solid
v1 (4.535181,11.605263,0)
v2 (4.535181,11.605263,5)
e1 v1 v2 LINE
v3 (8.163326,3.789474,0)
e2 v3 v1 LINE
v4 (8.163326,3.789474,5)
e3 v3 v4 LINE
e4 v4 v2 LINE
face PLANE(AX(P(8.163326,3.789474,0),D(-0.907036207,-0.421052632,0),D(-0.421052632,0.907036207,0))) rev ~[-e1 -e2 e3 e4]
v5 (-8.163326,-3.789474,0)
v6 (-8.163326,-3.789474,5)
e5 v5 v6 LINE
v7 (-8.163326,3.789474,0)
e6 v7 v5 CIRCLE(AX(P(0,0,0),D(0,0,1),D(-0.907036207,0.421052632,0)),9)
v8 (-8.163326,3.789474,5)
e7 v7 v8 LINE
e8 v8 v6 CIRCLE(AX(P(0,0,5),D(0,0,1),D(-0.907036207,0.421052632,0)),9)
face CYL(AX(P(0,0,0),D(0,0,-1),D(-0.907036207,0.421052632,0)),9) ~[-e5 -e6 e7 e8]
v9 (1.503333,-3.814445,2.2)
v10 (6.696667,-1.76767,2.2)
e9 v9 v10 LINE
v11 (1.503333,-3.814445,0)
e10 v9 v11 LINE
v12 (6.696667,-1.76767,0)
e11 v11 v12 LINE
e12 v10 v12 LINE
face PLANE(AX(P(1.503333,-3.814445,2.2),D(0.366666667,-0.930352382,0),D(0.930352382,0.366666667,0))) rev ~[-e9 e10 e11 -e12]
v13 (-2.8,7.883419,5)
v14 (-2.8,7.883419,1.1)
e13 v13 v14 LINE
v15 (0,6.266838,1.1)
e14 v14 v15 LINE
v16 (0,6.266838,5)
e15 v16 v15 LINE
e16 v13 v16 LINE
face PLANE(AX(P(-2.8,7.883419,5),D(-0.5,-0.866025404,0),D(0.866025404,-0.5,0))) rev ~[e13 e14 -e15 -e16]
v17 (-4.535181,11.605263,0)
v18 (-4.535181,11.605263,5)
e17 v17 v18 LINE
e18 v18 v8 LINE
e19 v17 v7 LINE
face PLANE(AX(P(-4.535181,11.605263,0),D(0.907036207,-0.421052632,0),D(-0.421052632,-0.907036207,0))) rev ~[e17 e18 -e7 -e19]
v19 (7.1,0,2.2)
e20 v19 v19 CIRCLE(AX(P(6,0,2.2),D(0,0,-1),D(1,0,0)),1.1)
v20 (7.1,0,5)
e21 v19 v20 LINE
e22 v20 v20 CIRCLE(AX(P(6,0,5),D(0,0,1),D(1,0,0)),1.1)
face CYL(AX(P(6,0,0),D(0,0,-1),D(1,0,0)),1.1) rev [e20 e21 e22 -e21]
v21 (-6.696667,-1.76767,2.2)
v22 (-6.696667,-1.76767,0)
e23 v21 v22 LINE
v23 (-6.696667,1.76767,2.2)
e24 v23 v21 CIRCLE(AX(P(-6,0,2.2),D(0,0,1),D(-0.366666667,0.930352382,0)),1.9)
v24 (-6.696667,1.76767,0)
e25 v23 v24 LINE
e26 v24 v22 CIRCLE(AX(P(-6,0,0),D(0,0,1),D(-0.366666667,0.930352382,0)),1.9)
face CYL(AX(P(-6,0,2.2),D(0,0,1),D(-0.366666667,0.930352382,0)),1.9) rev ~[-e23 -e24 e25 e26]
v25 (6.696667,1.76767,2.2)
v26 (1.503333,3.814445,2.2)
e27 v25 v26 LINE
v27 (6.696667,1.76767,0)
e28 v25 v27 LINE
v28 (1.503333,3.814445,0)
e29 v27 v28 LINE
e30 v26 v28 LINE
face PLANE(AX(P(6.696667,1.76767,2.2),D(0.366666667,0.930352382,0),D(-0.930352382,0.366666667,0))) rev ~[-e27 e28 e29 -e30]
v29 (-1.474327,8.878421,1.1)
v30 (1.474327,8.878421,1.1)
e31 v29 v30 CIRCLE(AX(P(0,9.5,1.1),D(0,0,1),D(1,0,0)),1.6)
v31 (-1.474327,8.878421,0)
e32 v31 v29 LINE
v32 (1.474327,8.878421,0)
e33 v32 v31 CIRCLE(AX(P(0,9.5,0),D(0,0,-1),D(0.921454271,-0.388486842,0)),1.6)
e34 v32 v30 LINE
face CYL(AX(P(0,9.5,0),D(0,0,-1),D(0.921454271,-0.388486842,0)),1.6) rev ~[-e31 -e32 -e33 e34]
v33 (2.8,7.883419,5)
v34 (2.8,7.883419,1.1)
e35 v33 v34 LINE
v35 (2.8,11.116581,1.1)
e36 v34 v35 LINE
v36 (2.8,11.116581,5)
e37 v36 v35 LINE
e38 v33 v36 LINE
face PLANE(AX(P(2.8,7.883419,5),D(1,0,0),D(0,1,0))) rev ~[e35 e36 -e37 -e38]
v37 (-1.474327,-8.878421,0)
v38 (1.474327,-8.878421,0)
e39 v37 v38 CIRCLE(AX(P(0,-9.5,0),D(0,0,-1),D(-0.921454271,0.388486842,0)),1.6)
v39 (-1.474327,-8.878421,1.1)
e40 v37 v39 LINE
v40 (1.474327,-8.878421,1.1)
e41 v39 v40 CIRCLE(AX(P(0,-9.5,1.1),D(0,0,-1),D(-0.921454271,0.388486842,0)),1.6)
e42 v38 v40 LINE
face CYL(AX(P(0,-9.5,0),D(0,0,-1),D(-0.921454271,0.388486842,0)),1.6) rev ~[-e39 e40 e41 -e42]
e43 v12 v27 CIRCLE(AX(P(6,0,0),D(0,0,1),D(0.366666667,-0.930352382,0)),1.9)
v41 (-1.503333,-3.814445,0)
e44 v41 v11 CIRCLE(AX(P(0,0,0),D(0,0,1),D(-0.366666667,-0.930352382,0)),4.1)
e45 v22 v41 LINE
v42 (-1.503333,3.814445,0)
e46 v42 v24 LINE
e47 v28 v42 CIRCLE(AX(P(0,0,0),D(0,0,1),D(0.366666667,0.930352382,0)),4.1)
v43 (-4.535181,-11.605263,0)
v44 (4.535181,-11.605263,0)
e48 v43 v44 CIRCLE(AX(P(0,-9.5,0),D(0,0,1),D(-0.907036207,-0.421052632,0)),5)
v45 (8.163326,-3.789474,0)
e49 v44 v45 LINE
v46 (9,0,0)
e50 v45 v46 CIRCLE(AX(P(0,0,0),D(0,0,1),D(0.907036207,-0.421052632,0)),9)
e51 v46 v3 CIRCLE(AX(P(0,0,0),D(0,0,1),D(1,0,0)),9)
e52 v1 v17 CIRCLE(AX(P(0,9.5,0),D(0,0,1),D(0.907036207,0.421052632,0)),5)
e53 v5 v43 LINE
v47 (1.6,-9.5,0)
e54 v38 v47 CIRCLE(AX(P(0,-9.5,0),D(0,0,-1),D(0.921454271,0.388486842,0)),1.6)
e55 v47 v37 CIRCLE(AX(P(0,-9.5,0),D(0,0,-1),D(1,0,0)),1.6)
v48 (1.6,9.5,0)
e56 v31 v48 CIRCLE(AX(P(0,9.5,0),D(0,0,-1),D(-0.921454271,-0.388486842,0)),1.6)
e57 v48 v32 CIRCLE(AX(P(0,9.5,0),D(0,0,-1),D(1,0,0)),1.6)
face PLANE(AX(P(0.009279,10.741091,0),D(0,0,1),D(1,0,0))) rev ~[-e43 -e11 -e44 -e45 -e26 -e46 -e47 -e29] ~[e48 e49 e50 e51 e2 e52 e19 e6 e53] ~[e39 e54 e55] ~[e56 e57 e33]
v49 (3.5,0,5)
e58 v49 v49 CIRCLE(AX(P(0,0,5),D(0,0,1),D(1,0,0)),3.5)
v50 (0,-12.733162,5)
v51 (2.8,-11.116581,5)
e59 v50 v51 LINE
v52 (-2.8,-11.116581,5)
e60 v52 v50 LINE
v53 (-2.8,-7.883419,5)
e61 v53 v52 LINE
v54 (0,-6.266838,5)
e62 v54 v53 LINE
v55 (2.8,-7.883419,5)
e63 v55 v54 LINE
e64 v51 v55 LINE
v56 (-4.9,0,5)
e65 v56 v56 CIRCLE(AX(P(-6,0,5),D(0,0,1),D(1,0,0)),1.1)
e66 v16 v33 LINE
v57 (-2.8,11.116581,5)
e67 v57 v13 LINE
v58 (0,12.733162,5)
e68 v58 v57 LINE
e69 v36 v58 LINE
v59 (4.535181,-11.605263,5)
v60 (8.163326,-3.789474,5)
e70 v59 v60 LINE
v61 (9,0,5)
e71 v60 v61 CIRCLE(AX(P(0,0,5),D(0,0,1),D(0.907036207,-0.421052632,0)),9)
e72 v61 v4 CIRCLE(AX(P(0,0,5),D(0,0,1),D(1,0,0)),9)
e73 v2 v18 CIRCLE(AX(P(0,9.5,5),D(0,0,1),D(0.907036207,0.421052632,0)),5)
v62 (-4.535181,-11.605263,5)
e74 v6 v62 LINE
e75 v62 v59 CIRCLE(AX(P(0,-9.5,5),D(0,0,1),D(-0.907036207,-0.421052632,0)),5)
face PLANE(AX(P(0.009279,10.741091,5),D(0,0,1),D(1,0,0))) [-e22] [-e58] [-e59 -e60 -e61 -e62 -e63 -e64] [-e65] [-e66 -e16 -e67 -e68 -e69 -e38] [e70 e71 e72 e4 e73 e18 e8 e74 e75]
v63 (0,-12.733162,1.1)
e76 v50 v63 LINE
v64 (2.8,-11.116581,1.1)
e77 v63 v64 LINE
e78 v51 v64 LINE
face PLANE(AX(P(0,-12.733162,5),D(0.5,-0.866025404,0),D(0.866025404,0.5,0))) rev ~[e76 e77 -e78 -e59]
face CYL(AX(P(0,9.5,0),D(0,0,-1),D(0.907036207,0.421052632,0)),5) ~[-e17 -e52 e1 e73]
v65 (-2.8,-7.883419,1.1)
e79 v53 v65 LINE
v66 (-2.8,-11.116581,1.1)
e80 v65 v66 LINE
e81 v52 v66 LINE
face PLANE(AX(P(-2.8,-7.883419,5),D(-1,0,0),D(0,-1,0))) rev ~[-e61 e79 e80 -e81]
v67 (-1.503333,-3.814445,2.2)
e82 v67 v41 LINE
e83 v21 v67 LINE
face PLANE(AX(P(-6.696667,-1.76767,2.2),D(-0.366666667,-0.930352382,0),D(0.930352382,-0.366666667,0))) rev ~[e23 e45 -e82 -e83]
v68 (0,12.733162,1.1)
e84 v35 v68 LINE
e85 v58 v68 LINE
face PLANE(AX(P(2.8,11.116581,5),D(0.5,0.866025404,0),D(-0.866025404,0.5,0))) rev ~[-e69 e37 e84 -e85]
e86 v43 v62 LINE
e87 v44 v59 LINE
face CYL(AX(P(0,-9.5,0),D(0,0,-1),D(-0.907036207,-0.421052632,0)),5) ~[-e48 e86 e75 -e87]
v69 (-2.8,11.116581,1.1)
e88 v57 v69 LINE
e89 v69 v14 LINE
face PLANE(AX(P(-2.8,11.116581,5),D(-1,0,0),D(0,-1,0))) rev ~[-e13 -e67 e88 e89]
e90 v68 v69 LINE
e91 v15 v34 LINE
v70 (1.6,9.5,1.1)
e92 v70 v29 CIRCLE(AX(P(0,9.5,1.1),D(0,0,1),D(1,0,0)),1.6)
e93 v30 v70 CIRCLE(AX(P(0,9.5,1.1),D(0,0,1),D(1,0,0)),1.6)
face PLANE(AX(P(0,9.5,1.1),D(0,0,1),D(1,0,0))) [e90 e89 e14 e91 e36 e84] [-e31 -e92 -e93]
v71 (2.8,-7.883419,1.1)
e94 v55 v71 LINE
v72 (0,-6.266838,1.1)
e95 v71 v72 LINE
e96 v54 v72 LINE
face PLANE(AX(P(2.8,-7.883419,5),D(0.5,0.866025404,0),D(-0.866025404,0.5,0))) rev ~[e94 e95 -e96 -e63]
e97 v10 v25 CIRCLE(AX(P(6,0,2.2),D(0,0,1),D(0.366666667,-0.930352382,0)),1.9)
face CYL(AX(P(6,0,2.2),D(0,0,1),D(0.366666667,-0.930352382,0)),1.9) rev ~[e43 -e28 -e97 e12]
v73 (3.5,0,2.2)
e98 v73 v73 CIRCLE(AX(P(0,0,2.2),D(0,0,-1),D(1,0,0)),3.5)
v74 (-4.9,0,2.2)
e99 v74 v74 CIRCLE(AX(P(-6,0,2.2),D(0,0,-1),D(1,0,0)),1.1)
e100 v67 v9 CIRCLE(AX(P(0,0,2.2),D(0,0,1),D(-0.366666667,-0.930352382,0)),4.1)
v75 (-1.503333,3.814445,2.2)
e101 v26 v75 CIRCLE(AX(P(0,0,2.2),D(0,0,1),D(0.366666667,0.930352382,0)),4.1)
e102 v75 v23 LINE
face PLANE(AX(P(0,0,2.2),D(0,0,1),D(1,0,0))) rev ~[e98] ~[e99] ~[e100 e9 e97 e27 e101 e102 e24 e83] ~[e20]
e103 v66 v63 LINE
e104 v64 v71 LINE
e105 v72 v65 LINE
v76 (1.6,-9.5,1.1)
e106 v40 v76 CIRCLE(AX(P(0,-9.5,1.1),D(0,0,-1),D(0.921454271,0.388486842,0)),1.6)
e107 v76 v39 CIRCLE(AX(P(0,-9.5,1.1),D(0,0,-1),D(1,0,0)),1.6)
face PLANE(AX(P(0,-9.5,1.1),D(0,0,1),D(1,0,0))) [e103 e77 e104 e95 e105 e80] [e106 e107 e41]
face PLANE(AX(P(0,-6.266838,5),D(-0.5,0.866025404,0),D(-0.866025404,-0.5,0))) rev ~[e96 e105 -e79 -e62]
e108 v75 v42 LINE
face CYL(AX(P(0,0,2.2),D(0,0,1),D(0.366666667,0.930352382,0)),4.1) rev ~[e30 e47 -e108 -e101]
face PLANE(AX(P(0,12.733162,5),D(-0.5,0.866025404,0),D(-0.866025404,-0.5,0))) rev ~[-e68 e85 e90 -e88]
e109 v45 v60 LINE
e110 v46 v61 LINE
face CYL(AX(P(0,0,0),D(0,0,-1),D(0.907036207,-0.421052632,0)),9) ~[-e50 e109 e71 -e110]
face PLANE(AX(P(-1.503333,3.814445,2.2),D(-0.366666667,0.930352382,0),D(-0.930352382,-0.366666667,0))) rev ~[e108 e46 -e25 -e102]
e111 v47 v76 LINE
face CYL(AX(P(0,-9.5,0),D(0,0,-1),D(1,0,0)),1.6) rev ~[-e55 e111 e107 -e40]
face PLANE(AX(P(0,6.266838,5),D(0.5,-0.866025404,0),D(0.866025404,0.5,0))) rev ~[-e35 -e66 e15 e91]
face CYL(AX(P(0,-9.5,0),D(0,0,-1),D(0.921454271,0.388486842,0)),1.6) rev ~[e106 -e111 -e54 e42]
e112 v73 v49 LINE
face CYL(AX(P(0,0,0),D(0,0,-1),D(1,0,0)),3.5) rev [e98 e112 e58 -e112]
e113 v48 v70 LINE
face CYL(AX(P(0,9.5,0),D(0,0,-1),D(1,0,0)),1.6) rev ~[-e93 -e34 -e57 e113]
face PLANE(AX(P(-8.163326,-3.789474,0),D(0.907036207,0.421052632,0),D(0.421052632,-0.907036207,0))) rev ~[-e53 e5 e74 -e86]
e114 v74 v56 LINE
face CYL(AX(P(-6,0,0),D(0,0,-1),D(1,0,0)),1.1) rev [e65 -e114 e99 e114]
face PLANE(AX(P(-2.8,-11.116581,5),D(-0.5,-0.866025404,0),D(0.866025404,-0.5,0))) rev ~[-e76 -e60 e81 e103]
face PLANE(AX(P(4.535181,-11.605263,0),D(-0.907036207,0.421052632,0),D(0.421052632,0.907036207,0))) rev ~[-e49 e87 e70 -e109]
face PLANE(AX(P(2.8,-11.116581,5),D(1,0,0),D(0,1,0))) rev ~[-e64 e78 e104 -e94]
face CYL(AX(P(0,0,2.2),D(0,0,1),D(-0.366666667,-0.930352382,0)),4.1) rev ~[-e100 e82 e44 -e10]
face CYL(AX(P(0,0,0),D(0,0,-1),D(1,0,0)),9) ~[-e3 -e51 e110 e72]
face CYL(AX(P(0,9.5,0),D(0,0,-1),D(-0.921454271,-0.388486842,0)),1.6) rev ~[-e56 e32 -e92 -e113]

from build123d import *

# Parameters (mm, degrees)
F0_R     = 1.1
F0_R_2   = 3.5
F1_DEPTH = 5
F2_R     = 1.6
F3_DEPTH = 3.9
F5_START = -2.8
F5_DEPTH = 22.2


with BuildPart() as f1:
    # F0 (on Top) → F1 (new body)
    with BuildSketch(Plane.XY):
        with BuildLine():
            ThreePointArc((-1.4743268336, 8.8784210526), (-0.3170781184, 11.0682670266), (1.6, 9.5))
            ThreePointArc((1.6, 9.5), (1.5682670266, 9.1829218816), (1.4743268336, 8.8784210526))
            ThreePointArc((1.4743268336, 8.8784210526), (3.1253325319, 8.4399227819), (4.6637452107, 7.6973684211))
            ThreePointArc((4.6637452107, 7.6973684211), (4.9152174954, 8.5831374295), (5, 9.5))
            ThreePointArc((5, 9.5), (4.882412579, 10.5779830278), (4.5351810367, 11.6052631579))
            ThreePointArc((4.5351810367, 11.6052631579), (0, 14.5), (-4.5351810367, 11.6052631579))
            ThreePointArc((-4.5351810367, 11.6052631579), (-4.9972964036, 9.6644039381), (-4.6637452107, 7.6973684211))
            ThreePointArc((-4.6637452107, 7.6973684211), (-3.1253325319, 8.4399227819), (-1.4743268336, 8.8784210526))
        make_face()
        with BuildLine():
            ThreePointArc((1.4743268336, 8.8784210526), (0, 7.9), (-1.4743268336, 8.8784210526))
            ThreePointArc((-1.4743268336, 8.8784210526), (-3.1253325319, 8.4399227819), (-4.6637452107, 7.6973684211))
            ThreePointArc((-4.6637452107, 7.6973684211), (0, 4.5), (4.6637452107, 7.6973684211))
            ThreePointArc((4.6637452107, 7.6973684211), (3.1253325319, 8.4399227819), (1.4743268336, 8.8784210526))
        make_face()
        with BuildLine():
            ThreePointArc((4.6637452107, 7.6973684211), (0, 4.5), (-4.6637452107, 7.6973684211))
            ThreePointArc((-4.6637452107, 7.6973684211), (-6.7045766773, 6.0040529294), (-8.1633258661, 3.7894736842))
            ThreePointArc((-8.1633258661, 3.7894736842), (-9, 0), (-8.1633258661, -3.7894736842))
            ThreePointArc((-8.1633258661, -3.7894736842), (-6.7045766773, -6.0040529294), (-4.6637452107, -7.6973684211))
            ThreePointArc((-4.6637452107, -7.6973684211), (0, -4.5), (4.6637452107, -7.6973684211))
            ThreePointArc((4.6637452107, -7.6973684211), (6.7045766773, -6.0040529294), (8.1633258661, -3.7894736842))
            ThreePointArc((8.1633258661, -3.7894736842), (8.7883426423, -1.94036945), (9, 0))
            ThreePointArc((9, 0), (8.7883426423, 1.94036945), (8.1633258661, 3.7894736842))
            ThreePointArc((8.1633258661, 3.7894736842), (6.7045766773, 6.0040529294), (4.6637452107, 7.6973684211))
        make_face()
        with Locations((-6, 0)):
            Circle(F0_R, mode=Mode.SUBTRACT)
        Circle(F0_R_2, mode=Mode.SUBTRACT)
        with Locations((6, 0)):
            Circle(F0_R, mode=Mode.SUBTRACT)
        with BuildLine():
            ThreePointArc((-8.1633258661, 3.7894736842), (-6.7045766773, 6.0040529294), (-4.6637452107, 7.6973684211))
            ThreePointArc((-4.6637452107, 7.6973684211), (-4.9972964036, 9.6644039381), (-4.5351810367, 11.6052631579))
            Line((-4.5351810367, 11.6052631579), (-8.1633258661, 3.7894736842))
        make_face()
        with BuildLine():
            ThreePointArc((5, 9.5), (4.9152174954, 8.5831374295), (4.6637452107, 7.6973684211))
            ThreePointArc((4.6637452107, 7.6973684211), (6.7045766773, 6.0040529294), (8.1633258661, 3.7894736842))
            Line((8.1633258661, 3.7894736842), (4.5351810367, 11.6052631579))
            ThreePointArc((4.5351810367, 11.6052631579), (4.882412579, 10.5779830278), (5, 9.5))
        make_face()
        with BuildLine():
            ThreePointArc((-4.6637452107, -7.6973684211), (-6.7045766773, -6.0040529294), (-8.1633258661, -3.7894736842))
            Line((-8.1633258661, -3.7894736842), (-4.5351810367, -11.6052631579))
            ThreePointArc((-4.5351810367, -11.6052631579), (-4.9972964036, -9.6644039381), (-4.6637452107, -7.6973684211))
        make_face()
        with BuildLine():
            ThreePointArc((-1.4743268336, -8.8784210526), (-3.1253325319, -8.4399227819), (-4.6637452107, -7.6973684211))
            ThreePointArc((-4.6637452107, -7.6973684211), (-4.9972964036, -9.6644039381), (-4.5351810367, -11.6052631579))
            ThreePointArc((-4.5351810367, -11.6052631579), (0, -14.5), (4.5351810367, -11.6052631579))
            ThreePointArc((4.5351810367, -11.6052631579), (4.882412579, -10.5779830278), (5, -9.5))
            ThreePointArc((5, -9.5), (4.9152174954, -8.5831374295), (4.6637452107, -7.6973684211))
            ThreePointArc((4.6637452107, -7.6973684211), (3.1253325319, -8.4399227819), (1.4743268336, -8.8784210526))
            ThreePointArc((1.4743268336, -8.8784210526), (1.5682670266, -9.1829218816), (1.6, -9.5))
            ThreePointArc((1.6, -9.5), (-0.3170781184, -11.0682670266), (-1.4743268336, -8.8784210526))
        make_face()
        with BuildLine():
            ThreePointArc((4.6637452107, -7.6973684211), (0, -4.5), (-4.6637452107, -7.6973684211))
            ThreePointArc((-4.6637452107, -7.6973684211), (-3.1253325319, -8.4399227819), (-1.4743268336, -8.8784210526))
            ThreePointArc((-1.4743268336, -8.8784210526), (0, -7.9), (1.4743268336, -8.8784210526))
            ThreePointArc((1.4743268336, -8.8784210526), (3.1253325319, -8.4399227819), (4.6637452107, -7.6973684211))
        make_face()
        with BuildLine():
            Line((4.5351810367, -11.6052631579), (8.1633258661, -3.7894736842))
            ThreePointArc((8.1633258661, -3.7894736842), (6.7045766773, -6.0040529294), (4.6637452107, -7.6973684211))
            ThreePointArc((4.6637452107, -7.6973684211), (4.9152174954, -8.5831374295), (5, -9.5))
            ThreePointArc((5, -9.5), (4.882412579, -10.5779830278), (4.5351810367, -11.6052631579))
        make_face()
    extrude(amount=F1_DEPTH)

    # F2 (on face) → F3 (cut)
    with BuildSketch(Plane.XY.offset(5)):
        Polygon((2.8, 7.8834192463), (2.8, 11.1165807537), (0, 12.7331615075), (-2.8, 11.1165807537), (-2.8, 7.8834192463), (0, 6.2668384925), align=None)
        with Locations((0, 9.5)):
            Circle(F2_R, mode=Mode.SUBTRACT)
        Polygon((-2.8, -11.1165807537), (0, -12.7331615075), (2.8, -11.1165807537), (2.8, -7.8834192463), (0, -6.2668384925), (-2.8, -7.8834192463), align=None)
    extrude(amount=-F3_DEPTH, mode=Mode.SUBTRACT)

    # F4 (on face) → F5 (cut)
    with BuildSketch(Plane.XY.offset(5).offset(F5_START)):
        with BuildLine():
            Line((-1.5033333333, 3.8144447681), (-6.6966666667, 1.7676695267))
            ThreePointArc((-6.6966666667, 1.7676695267), (-7.9, 0), (-6.6966666667, -1.7676695267))
            Line((-6.6966666667, -1.7676695267), (-1.5033333333, -3.8144447681))
            ThreePointArc((-1.5033333333, -3.8144447681), (0, -4.1), (1.5033333333, -3.8144447681))
            Line((1.5033333333, -3.8144447681), (6.6966666667, -1.7676695267))
            ThreePointArc((6.6966666667, -1.7676695267), (7.9, 0), (6.6966666667, 1.7676695267))
            Line((6.6966666667, 1.7676695267), (1.5033333333, 3.8144447681))
            ThreePointArc((1.5033333333, 3.8144447681), (0, 4.1), (-1.5033333333, 3.8144447681))
        make_face()
    extrude(amount=-F5_DEPTH, mode=Mode.SUBTRACT)


solid = f1.part
